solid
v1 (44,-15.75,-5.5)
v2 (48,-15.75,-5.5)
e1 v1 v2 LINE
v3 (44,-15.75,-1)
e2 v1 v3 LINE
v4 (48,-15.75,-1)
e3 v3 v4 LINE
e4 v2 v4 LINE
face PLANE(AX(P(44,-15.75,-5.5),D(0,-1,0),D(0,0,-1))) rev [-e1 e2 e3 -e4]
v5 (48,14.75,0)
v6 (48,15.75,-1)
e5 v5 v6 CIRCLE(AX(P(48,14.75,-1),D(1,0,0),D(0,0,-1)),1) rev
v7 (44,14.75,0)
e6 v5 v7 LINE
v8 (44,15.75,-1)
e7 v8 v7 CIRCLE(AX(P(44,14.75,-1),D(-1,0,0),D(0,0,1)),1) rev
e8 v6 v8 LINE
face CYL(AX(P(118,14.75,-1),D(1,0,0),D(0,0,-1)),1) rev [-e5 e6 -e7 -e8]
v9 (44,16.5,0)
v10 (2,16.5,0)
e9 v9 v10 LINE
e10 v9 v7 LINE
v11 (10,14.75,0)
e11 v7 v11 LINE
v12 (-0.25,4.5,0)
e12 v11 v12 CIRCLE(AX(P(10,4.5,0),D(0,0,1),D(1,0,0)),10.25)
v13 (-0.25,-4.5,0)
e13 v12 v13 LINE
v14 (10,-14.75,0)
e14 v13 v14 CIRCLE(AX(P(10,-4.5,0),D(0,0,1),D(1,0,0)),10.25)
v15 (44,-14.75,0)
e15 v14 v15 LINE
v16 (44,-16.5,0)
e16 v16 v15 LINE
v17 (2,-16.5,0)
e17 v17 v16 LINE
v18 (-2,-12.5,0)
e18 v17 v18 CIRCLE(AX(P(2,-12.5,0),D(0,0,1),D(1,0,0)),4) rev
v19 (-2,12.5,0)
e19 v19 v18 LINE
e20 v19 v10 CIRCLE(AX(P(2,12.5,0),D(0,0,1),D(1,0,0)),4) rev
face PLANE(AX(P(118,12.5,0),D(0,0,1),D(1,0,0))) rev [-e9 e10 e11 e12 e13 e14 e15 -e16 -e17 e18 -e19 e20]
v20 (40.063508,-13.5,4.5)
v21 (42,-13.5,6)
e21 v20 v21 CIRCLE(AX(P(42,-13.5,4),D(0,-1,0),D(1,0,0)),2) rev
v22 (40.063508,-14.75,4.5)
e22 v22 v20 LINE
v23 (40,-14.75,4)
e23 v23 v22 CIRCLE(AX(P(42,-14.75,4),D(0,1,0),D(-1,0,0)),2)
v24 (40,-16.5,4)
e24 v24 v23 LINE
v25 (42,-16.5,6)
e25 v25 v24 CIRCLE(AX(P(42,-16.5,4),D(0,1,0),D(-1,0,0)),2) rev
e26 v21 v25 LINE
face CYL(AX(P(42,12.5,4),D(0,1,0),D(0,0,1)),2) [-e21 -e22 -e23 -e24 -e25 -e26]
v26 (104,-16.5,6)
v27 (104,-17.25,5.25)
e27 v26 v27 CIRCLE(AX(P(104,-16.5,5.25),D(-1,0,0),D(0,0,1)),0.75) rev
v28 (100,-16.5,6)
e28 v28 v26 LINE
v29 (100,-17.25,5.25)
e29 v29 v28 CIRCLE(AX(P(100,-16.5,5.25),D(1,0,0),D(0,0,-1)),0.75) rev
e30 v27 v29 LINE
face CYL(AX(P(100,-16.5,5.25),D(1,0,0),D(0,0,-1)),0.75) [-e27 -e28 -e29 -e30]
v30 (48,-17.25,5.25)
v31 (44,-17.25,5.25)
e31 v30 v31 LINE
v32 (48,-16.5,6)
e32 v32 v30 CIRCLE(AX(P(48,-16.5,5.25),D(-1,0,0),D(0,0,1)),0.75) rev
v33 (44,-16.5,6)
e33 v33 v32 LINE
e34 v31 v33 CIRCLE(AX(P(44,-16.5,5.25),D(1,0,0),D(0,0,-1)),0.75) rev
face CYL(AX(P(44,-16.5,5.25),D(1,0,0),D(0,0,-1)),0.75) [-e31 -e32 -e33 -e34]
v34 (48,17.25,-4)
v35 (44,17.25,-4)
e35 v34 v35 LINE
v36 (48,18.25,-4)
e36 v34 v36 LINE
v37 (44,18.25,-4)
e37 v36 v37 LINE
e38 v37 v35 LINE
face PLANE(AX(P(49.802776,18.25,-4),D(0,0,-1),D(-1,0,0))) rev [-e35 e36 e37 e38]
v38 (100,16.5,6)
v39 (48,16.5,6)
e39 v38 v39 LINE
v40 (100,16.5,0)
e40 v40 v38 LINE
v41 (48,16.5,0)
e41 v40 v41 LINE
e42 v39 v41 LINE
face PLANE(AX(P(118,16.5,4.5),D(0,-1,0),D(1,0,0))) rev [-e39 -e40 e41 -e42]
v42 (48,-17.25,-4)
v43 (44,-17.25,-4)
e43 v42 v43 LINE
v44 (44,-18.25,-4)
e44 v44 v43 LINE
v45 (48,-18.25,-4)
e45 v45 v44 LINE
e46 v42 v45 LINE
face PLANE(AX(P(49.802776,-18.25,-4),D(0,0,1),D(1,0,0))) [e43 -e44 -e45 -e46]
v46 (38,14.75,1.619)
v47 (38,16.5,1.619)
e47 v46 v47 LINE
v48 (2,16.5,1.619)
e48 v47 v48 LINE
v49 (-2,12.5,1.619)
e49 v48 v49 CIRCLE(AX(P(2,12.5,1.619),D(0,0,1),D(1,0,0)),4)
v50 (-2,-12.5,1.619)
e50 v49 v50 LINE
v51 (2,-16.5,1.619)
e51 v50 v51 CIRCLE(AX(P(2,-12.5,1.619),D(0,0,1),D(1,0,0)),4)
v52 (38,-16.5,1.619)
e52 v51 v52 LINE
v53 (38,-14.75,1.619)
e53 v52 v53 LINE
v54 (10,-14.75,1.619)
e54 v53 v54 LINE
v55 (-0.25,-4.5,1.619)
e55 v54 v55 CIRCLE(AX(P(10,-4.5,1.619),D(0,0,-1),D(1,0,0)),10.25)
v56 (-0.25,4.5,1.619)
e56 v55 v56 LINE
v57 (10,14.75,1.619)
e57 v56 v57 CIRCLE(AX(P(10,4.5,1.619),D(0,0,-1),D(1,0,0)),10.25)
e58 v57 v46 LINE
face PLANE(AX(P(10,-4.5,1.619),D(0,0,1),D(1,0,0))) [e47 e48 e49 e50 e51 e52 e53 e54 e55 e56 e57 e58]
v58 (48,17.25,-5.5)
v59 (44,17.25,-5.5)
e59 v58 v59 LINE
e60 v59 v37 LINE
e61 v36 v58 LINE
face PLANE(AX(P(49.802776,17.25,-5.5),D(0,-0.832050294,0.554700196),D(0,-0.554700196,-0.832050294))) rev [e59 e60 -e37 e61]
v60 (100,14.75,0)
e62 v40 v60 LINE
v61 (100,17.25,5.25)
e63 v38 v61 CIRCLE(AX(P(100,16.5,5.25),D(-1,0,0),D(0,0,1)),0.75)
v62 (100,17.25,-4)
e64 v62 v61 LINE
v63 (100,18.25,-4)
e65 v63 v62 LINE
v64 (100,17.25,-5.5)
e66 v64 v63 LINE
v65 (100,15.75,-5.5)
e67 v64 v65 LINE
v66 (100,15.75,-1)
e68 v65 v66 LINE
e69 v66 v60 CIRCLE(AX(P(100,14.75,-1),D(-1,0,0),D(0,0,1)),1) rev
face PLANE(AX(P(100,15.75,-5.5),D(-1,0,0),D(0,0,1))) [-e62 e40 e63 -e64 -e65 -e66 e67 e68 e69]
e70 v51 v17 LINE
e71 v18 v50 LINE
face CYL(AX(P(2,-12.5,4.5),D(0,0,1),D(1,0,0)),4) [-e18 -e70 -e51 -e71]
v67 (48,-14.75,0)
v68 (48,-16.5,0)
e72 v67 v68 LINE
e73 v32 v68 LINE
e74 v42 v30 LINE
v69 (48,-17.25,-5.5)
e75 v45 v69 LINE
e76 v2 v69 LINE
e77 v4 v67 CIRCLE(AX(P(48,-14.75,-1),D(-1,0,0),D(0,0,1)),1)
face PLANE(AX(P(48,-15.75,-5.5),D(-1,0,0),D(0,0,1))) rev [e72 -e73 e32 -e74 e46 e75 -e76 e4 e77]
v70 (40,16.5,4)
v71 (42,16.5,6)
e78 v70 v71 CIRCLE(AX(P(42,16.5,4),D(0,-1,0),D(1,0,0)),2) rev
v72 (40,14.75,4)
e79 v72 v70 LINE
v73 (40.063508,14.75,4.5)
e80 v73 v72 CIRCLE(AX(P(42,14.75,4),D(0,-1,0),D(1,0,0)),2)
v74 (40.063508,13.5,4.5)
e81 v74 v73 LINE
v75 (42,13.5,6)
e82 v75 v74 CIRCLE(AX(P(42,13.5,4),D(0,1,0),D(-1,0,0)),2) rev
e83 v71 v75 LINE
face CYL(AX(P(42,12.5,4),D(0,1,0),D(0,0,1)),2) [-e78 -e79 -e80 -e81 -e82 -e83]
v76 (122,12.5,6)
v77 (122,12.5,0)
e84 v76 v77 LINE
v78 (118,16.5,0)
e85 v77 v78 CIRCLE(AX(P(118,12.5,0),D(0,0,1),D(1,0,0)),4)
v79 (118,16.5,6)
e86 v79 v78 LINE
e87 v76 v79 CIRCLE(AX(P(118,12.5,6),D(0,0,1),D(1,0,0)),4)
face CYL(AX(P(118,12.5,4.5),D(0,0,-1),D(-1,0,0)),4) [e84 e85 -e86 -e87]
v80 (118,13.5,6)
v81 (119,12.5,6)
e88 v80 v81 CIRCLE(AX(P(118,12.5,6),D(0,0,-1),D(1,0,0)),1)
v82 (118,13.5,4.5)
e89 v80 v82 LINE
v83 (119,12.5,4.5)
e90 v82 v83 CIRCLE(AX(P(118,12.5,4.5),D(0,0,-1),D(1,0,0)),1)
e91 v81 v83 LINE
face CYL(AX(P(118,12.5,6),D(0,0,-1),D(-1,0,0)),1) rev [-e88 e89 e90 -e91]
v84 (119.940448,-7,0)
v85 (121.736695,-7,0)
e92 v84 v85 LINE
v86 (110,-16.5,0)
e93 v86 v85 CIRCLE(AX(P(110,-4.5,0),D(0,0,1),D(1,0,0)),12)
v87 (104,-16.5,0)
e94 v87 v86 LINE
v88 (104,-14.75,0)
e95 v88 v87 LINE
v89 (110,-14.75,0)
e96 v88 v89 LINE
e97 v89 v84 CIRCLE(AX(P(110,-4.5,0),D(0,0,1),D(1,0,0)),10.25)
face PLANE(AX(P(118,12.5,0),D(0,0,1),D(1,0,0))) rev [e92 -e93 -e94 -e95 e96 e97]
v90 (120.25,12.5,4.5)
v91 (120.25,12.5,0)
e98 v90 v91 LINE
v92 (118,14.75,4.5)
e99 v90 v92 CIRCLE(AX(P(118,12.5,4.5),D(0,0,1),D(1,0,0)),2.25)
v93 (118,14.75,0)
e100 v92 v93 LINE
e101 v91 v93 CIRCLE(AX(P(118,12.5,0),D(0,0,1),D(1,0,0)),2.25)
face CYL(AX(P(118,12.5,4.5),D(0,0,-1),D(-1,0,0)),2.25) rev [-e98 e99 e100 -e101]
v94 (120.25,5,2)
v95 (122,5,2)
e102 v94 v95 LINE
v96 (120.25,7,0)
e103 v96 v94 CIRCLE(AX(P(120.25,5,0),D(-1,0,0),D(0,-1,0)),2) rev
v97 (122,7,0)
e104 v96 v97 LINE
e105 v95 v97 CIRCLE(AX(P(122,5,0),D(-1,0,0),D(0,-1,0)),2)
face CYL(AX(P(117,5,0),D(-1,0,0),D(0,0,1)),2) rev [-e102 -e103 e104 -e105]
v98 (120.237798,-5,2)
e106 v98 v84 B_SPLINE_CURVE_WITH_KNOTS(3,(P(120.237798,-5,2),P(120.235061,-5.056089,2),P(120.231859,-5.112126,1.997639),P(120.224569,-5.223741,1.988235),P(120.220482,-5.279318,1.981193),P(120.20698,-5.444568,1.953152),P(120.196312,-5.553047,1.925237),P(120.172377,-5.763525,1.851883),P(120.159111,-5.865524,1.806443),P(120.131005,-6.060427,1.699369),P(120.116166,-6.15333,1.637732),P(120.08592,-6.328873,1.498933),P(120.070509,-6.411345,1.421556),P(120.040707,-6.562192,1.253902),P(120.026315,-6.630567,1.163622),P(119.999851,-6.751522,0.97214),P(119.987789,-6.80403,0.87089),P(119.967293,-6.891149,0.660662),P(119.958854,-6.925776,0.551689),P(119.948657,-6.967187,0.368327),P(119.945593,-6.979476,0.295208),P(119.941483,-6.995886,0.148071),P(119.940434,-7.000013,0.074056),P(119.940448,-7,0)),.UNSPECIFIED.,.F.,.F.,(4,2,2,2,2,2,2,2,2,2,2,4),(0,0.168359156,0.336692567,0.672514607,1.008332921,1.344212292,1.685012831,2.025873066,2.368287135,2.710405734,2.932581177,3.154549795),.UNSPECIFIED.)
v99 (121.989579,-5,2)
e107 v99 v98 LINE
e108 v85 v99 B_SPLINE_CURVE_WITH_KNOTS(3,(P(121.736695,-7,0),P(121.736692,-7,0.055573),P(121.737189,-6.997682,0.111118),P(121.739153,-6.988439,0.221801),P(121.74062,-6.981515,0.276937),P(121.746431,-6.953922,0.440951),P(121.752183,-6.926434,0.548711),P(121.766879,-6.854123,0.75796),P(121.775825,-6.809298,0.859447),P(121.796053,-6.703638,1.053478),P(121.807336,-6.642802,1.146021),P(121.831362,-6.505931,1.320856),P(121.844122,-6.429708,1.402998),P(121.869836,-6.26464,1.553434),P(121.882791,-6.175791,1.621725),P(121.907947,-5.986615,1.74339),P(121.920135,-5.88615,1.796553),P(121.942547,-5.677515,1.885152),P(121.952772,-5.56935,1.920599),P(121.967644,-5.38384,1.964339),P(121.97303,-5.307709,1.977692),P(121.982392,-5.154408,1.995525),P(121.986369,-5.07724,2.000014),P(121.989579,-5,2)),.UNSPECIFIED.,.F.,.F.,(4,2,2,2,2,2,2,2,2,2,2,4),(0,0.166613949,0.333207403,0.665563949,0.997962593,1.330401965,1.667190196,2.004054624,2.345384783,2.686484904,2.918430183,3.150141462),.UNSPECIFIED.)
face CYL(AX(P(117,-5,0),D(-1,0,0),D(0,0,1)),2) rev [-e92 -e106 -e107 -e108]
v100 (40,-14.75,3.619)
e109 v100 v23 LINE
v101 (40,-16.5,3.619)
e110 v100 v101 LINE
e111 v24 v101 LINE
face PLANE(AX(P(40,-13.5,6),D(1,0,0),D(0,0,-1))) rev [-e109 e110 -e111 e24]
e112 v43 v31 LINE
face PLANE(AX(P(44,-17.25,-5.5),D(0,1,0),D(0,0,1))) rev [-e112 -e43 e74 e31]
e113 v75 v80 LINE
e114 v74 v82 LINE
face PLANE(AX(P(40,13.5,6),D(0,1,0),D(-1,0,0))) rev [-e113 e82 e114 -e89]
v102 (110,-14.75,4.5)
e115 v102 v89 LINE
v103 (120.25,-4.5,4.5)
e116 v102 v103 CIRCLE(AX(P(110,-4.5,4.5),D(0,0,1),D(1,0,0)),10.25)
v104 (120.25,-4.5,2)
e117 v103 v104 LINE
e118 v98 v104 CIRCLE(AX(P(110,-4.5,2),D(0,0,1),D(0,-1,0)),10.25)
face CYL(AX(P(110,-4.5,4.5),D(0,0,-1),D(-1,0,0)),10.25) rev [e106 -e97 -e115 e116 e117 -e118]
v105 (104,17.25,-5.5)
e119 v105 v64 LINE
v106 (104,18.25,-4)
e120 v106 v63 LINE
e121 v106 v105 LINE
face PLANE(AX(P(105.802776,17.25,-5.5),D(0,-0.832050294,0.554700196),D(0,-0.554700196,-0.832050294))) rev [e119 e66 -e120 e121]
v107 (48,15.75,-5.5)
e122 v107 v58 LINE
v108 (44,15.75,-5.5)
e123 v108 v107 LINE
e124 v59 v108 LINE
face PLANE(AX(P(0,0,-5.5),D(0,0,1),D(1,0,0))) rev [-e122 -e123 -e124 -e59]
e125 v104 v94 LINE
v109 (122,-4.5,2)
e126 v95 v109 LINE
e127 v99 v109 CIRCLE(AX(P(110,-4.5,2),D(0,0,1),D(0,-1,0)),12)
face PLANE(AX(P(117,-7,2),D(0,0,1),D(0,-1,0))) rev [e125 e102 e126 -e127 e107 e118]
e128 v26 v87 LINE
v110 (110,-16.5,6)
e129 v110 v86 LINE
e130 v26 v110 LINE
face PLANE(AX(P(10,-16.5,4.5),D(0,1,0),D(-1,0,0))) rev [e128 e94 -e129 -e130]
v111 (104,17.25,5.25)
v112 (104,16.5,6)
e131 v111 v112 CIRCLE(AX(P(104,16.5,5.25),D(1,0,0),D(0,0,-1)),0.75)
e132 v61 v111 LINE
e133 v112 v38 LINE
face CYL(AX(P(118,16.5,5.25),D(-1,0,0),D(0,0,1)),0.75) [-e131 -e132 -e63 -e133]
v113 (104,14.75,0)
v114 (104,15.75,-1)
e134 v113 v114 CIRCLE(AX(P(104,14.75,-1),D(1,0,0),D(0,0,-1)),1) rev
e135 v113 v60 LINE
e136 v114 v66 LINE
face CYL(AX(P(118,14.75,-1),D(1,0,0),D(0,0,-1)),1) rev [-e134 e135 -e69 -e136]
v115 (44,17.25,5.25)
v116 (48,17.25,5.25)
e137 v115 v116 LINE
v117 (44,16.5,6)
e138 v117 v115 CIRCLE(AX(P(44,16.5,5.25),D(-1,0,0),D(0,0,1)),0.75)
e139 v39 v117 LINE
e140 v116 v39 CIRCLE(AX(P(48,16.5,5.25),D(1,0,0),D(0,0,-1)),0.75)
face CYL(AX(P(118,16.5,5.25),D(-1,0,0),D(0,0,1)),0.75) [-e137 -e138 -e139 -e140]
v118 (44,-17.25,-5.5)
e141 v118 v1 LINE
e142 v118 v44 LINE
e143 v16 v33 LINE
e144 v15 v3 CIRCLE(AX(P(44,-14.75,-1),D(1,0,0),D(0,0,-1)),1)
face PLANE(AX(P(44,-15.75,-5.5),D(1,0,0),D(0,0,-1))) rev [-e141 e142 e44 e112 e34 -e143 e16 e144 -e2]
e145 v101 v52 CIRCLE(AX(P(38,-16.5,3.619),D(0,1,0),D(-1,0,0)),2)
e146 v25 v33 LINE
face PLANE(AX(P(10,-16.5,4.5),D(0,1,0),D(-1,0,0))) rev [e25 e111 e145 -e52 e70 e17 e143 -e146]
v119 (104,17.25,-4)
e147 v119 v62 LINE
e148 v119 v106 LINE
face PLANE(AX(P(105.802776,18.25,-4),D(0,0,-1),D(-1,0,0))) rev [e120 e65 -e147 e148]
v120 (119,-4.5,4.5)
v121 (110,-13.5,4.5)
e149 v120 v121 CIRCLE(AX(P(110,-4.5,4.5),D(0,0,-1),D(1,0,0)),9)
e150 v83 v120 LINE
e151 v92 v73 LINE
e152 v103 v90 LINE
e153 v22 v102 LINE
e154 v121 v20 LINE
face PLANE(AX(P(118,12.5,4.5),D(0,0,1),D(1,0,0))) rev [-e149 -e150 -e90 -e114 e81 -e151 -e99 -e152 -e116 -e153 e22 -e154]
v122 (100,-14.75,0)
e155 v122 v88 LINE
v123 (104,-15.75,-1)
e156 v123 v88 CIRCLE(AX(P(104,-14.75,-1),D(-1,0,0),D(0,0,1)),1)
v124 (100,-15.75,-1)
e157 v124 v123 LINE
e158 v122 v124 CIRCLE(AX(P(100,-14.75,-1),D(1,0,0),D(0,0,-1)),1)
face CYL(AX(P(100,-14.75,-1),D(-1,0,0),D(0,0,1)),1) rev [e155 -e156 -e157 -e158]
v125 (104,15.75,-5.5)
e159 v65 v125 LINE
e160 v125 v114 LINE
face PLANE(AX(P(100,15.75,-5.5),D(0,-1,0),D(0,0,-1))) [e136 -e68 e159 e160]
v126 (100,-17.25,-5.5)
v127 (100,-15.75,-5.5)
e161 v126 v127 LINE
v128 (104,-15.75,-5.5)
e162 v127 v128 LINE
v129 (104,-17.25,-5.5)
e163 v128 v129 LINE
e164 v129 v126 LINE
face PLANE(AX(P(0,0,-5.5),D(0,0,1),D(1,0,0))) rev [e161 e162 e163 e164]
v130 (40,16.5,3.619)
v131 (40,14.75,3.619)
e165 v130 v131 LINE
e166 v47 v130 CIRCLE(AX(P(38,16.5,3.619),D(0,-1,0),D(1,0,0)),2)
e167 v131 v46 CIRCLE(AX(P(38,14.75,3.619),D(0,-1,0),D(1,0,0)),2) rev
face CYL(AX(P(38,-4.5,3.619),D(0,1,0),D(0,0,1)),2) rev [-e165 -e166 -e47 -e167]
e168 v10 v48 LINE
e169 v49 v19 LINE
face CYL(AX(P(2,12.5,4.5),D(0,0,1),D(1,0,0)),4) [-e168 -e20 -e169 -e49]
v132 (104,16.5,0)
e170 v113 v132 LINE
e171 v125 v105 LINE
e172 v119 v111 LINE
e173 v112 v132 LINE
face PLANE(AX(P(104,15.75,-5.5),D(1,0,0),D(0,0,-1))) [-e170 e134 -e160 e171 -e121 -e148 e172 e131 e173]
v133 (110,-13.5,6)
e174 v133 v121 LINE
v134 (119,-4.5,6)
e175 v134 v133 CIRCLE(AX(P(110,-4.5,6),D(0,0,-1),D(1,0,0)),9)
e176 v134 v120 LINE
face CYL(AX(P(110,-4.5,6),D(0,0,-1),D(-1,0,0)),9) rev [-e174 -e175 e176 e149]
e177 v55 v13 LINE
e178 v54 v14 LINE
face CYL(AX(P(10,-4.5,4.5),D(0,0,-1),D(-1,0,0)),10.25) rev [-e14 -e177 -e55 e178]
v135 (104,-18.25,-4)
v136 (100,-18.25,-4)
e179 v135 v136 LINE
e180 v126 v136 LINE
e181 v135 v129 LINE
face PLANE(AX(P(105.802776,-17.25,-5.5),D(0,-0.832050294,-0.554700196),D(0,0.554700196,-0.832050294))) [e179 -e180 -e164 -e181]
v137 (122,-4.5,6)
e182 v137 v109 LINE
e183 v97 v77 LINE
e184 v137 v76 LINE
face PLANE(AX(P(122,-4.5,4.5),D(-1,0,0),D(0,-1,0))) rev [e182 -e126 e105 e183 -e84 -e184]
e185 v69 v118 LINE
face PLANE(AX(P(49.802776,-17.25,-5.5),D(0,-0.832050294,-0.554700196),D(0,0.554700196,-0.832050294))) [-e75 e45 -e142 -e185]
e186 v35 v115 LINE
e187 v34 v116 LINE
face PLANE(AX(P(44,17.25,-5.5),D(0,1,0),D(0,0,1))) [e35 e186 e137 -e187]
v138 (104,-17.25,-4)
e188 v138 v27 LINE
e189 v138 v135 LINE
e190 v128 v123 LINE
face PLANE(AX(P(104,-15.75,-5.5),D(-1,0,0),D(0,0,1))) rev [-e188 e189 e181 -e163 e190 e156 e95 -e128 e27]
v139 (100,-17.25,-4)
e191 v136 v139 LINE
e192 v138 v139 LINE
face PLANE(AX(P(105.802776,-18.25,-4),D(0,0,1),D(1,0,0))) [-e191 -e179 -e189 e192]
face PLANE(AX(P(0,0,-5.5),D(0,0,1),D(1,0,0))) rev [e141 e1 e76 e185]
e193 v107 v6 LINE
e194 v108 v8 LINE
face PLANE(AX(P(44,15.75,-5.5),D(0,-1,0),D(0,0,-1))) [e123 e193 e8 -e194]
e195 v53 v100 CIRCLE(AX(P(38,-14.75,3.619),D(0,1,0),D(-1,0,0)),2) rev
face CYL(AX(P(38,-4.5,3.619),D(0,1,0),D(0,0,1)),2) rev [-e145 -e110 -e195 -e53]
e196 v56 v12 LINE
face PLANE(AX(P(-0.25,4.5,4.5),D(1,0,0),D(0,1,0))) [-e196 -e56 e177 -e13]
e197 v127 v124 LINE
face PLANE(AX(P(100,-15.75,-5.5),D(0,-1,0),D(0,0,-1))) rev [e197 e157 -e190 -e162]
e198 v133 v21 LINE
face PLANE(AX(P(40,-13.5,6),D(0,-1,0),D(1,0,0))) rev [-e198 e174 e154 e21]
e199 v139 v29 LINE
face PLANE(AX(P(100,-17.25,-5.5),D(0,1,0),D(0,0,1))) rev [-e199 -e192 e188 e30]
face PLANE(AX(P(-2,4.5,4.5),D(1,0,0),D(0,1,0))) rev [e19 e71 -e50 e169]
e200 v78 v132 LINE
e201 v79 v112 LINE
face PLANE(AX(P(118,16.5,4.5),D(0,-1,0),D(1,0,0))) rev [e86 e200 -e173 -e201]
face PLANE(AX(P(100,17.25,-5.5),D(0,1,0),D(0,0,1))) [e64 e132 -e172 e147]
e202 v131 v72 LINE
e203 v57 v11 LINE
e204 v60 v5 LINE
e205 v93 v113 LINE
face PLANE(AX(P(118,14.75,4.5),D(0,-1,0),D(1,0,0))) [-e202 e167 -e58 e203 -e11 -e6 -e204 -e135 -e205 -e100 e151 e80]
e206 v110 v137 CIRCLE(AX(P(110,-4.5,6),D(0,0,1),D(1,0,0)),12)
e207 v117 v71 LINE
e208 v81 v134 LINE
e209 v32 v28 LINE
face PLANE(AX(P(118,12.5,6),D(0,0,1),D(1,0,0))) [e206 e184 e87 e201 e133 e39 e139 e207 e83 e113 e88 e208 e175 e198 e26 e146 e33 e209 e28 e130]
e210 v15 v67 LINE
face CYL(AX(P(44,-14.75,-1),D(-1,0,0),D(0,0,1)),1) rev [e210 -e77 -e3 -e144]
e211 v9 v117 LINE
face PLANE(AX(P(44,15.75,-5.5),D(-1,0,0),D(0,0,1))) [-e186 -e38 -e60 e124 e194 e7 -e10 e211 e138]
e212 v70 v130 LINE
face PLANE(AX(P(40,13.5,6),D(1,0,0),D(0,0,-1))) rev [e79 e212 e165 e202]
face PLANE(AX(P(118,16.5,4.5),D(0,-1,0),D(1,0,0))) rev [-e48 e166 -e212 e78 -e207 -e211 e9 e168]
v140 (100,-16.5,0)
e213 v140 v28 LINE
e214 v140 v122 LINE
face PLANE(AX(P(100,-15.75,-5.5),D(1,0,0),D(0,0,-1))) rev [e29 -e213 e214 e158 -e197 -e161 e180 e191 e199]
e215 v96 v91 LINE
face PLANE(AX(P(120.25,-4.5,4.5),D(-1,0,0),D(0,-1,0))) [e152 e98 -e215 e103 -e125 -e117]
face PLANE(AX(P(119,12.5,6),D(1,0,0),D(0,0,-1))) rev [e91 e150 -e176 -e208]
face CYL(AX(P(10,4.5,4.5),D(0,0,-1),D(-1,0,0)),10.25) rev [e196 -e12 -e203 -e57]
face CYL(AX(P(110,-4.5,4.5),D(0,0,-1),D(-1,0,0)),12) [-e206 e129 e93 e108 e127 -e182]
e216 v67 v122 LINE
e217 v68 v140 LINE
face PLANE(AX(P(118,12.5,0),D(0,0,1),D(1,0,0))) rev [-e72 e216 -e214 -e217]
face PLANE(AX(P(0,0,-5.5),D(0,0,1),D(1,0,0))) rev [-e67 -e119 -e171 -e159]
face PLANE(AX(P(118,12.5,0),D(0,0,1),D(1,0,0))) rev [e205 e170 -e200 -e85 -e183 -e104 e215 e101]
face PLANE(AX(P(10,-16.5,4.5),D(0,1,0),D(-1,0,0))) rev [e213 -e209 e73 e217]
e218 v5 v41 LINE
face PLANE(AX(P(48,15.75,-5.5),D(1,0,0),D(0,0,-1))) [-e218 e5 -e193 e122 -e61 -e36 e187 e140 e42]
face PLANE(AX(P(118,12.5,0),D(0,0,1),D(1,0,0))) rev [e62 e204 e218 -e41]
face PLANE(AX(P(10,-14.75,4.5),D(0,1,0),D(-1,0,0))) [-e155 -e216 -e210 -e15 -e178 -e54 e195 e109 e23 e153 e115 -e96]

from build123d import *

# Parameters (mm, degrees)
BOSS_EXTRUDE2_THICKNESS_OF_TC_PCB_DEPTH = 4.5
BOSS_EXTRUDE3_RETAINING_TOP_DEPTH       = 1.5
CUT_EXTRUDE1_START                      = -2.881
CUT_EXTRUDE1_EXPOSED_TC_FRONT_DEPTH     = 2.881
FILLET1_R                               = 2
SKETCH7_W                               = 2
SKETCH7_H                               = 14
CUT_EXTRUDE1_USBC_CUTOUT_DEPTH          = 5
FILLET3_R                               = 2
SKETCH8_W                               = 4
SKETCH8_H                               = 1.5
BOSS_EXTRUDE5_SNAP_POSTS_DEPTH          = 5.5
BOSS_EXTRUDE6_SNAP_NOTCH_1_DEPTH        = 4
BOSS_EXTRUDE7_SNAP_NOTCH_2_DEPTH        = 4
SKETCH11_W                              = 4
SKETCH11_H                              = 2.5
BOSS_EXTRUDE1_SNAP_BUMPS_DEPTH          = 6
FILLET6_R                               = 1
FILLET7_R                               = 0.75
BOSS_EXTRUDE1_START                     = -1.619
BOSS_EXTRUDE1_DEPTH                     = 1.619
FILLET8_R                               = 4


with BuildPart() as part:
    # Sketch3 → Boss-Extrude2 - thickness of TC + PCB (new body)
    with BuildSketch(Plane.XY):
        with BuildLine():
            Line((122, -4.5), (122, 12.5))
            ThreePointArc((122, 12.5), (120.828427125, 15.328427125), (118, 16.5))
            Line((118, 16.5), (10, 16.5))
            ThreePointArc((10, 16.5), (1.514718626, 12.985281374), (-2, 4.5))
            Line((-2, 4.5), (-2, -4.5))
            ThreePointArc((-2, -4.5), (1.514718626, -12.985281374), (10, -16.5))
            Line((10, -16.5), (110, -16.5))
            ThreePointArc((110, -16.5), (118.485281374, -12.985281374), (122, -4.5))
        make_face()
        with BuildLine():
            Line((118, 14.75), (10, 14.75))
            ThreePointArc((10, 14.75), (2.752155493, 11.747844507), (-0.25, 4.5))
            Line((-0.25, 4.5), (-0.25, -4.5))
            ThreePointArc((-0.25, -4.5), (2.752155493, -11.747844507), (10, -14.75))
            Line((10, -14.75), (110, -14.75))
            ThreePointArc((110, -14.75), (117.247844507, -11.747844507), (120.25, -4.5))
            Line((120.25, -4.5), (120.25, 12.5))
            ThreePointArc((120.25, 12.5), (119.590990258, 14.090990258), (118, 14.75))
        make_face(mode=Mode.SUBTRACT)
    extrude(amount=BOSS_EXTRUDE2_THICKNESS_OF_TC_PCB_DEPTH)

    # Sketch4 → Boss-Extrude3 - retaining top (add)
    with BuildSketch(Plane.XY.offset(4.5)):
        with BuildLine():
            Line((40, 13.5), (118, 13.5))
            ThreePointArc((118, 13.5), (118.707106781, 13.207106781), (119, 12.5))
            Line((119, 12.5), (119, -4.5))
            ThreePointArc((119, -4.5), (116.363961031, -10.863961031), (110, -13.5))
            Line((110, -13.5), (40, -13.5))
            Line((40, -13.5), (40, -16.5))
            Line((40, -16.5), (110, -16.5))
            ThreePointArc((110, -16.5), (118.485281374, -12.985281374), (122, -4.5))
            Line((122, -4.5), (122, 12.5))
            ThreePointArc((122, 12.5), (120.828427125, 15.328427125), (118, 16.5))
            Line((118, 16.5), (40, 16.5))
            Line((40, 16.5), (40, 13.5))
        make_face()
    extrude(amount=BOSS_EXTRUDE3_RETAINING_TOP_DEPTH)

    # Sketch5 → Cut-Extrude1 - exposed TC front (cut)
    with BuildSketch(Plane.XY.offset(4.5).offset(CUT_EXTRUDE1_START)):
        with BuildLine():
            Line((40, -16.5), (40, -14.75))
            Line((40, -14.75), (10, -14.75))
            ThreePointArc((10, -14.75), (2.752155493, -11.747844507), (-0.25, -4.5))
            Line((-0.25, -4.5), (-0.25, 4.5))
            ThreePointArc((-0.25, 4.5), (2.752155493, 11.747844507), (10, 14.75))
            Line((10, 14.75), (40, 14.75))
            Line((40, 14.75), (40, 16.5))
            Line((40, 16.5), (10, 16.5))
            ThreePointArc((10, 16.5), (1.514718626, 12.985281374), (-2, 4.5))
            Line((-2, 4.5), (-2, -4.5))
            ThreePointArc((-2, -4.5), (1.514718626, -12.985281374), (10, -16.5))
            Line((10, -16.5), (40, -16.5))
        make_face()
    extrude(amount=CUT_EXTRUDE1_EXPOSED_TC_FRONT_DEPTH, mode=Mode.SUBTRACT)

    # Fillet1
    fillet1_edges = [part.edges().sort_by_distance(p)[0] for p in [
        (40, 15, 6),
        (40, 15.625, 1.619),
        (40, -15, 6),
        (40, -15.625, 1.619),
    ]]
    fillet(fillet1_edges, radius=FILLET1_R)

    # Sketch7 → Cut-Extrude1 - USBC cutout (cut)
    with BuildSketch(Plane(origin=(122, 0, 0), x_dir=(0, 0, -1), z_dir=(1, 0, 0))):
        with Locations((-1, 0)):
            Rectangle(SKETCH7_W, SKETCH7_H)
    extrude(amount=-CUT_EXTRUDE1_USBC_CUTOUT_DEPTH, mode=Mode.SUBTRACT)

    # Fillet3
    fillet3_edges = [part.edges().sort_by_distance(p)[0] for p in [
        (121.125, 7, 2),
        (120.838571135, -7, 2),
    ]]
    fillet(fillet3_edges, radius=FILLET3_R - 0.0001)  # a hair under: the kernel refuses the full size

    # Sketch8 → Boss-Extrude5 - snap posts (add)
    with BuildSketch(Plane(origin=(0, 0, 0), x_dir=(-1, 0, 0), z_dir=(0, 0, -1))):
        with Locations((-46, -16.5)):
            Rectangle(SKETCH8_W, SKETCH8_H)
        with Locations((-102, -16.5)):
            Rectangle(SKETCH8_W, SKETCH8_H)
    boss_extrude5_snap_posts = extrude(amount=BOSS_EXTRUDE5_SNAP_POSTS_DEPTH)

    # Sketch9 → Boss-Extrude6 - snap notch 1 (add)
    with BuildSketch(Plane.ZY.offset(-44)):
        Polygon((-5.5, -17.25), (-4, -18.25), (-4, -17.25), align=None)
    boss_extrude6_snap_notch_1 = extrude(amount=-BOSS_EXTRUDE6_SNAP_NOTCH_1_DEPTH)

    # Sketch10 → Boss-Extrude7 - snap notch 2 (add)
    with BuildSketch(Plane.ZY.offset(-100)):
        Polygon((-4, -18.25), (-4, -17.25), (-5.5, -17.25), align=None)
    boss_extrude7_snap_notch_2 = extrude(amount=-BOSS_EXTRUDE7_SNAP_NOTCH_2_DEPTH)

    # Sketch11 → Boss-Extrude1 - snap bumps (add)
    with BuildSketch(Plane(origin=(0, 0, 0), x_dir=(-1, 0, 0), z_dir=(0, 0, -1))):
        with Locations((-46, -16)):
            Rectangle(SKETCH11_W, SKETCH11_H)
        with Locations((-102, -16)):
            Rectangle(SKETCH11_W, SKETCH11_H)
    boss_extrude1_snap_bumps = extrude(amount=-BOSS_EXTRUDE1_SNAP_BUMPS_DEPTH)

    # Mirror1: Boss-Extrude5 - snap posts, Boss-Extrude6 - snap notch 1, Boss-Extrude7 - snap notch 2, Boss-Extrude1 - snap bumps across plane
    add(boss_extrude5_snap_posts.mirror(Plane.ZX))
    add(boss_extrude6_snap_notch_1.mirror(Plane.ZX))
    add(boss_extrude7_snap_notch_2.mirror(Plane.ZX))
    add(boss_extrude1_snap_bumps.mirror(Plane.ZX))

    # Fillet6
    fillet6_edges = [part.edges().sort_by_distance(p)[0] for p in [
        (46, -15.75, 0),
        (102, -15.75, 0),
        (46, 15.75, 0),
        (102, 15.75, 0),
    ]]
    fillet(fillet6_edges, radius=FILLET6_R - 0.0001)  # a hair under: the kernel refuses the full size

    # Fillet7
    fillet7_edges = [part.edges().sort_by_distance(p)[0] for p in [
        (46, -17.25, 6),
        (102, -17.25, 6),
        (46, 17.25, 6),
        (102, 17.25, 6),
    ]]
    fillet(fillet7_edges, radius=FILLET7_R)

    # Sketch13 → Boss-Extrude1 (add)
    with BuildSketch(Plane.XY.offset(1.619).offset(BOSS_EXTRUDE1_START)):
        with BuildLine():
            Line((-2, 4.5), (-2, 16.5))
            Line((-2, 16.5), (10, 16.5))
            ThreePointArc((10, 16.5), (1.514718626, 12.985281374), (-2, 4.5))
        make_face()
        with BuildLine():
            Line((-2, -4.5), (-2, -16.5))
            Line((-2, -16.5), (10, -16.5))
            ThreePointArc((10, -16.5), (1.514718626, -12.985281374), (-2, -4.5))
        make_face()
    extrude(amount=BOSS_EXTRUDE1_DEPTH)

    # Fillet8
    fillet8_edges = [part.edges().sort_by_distance(p)[0] for p in [
        (-2, 16.5, 0.8095),
        (-2, -16.5, 0.8095),
    ]]
    fillet(fillet8_edges, radius=FILLET8_R)


solid = part.part
